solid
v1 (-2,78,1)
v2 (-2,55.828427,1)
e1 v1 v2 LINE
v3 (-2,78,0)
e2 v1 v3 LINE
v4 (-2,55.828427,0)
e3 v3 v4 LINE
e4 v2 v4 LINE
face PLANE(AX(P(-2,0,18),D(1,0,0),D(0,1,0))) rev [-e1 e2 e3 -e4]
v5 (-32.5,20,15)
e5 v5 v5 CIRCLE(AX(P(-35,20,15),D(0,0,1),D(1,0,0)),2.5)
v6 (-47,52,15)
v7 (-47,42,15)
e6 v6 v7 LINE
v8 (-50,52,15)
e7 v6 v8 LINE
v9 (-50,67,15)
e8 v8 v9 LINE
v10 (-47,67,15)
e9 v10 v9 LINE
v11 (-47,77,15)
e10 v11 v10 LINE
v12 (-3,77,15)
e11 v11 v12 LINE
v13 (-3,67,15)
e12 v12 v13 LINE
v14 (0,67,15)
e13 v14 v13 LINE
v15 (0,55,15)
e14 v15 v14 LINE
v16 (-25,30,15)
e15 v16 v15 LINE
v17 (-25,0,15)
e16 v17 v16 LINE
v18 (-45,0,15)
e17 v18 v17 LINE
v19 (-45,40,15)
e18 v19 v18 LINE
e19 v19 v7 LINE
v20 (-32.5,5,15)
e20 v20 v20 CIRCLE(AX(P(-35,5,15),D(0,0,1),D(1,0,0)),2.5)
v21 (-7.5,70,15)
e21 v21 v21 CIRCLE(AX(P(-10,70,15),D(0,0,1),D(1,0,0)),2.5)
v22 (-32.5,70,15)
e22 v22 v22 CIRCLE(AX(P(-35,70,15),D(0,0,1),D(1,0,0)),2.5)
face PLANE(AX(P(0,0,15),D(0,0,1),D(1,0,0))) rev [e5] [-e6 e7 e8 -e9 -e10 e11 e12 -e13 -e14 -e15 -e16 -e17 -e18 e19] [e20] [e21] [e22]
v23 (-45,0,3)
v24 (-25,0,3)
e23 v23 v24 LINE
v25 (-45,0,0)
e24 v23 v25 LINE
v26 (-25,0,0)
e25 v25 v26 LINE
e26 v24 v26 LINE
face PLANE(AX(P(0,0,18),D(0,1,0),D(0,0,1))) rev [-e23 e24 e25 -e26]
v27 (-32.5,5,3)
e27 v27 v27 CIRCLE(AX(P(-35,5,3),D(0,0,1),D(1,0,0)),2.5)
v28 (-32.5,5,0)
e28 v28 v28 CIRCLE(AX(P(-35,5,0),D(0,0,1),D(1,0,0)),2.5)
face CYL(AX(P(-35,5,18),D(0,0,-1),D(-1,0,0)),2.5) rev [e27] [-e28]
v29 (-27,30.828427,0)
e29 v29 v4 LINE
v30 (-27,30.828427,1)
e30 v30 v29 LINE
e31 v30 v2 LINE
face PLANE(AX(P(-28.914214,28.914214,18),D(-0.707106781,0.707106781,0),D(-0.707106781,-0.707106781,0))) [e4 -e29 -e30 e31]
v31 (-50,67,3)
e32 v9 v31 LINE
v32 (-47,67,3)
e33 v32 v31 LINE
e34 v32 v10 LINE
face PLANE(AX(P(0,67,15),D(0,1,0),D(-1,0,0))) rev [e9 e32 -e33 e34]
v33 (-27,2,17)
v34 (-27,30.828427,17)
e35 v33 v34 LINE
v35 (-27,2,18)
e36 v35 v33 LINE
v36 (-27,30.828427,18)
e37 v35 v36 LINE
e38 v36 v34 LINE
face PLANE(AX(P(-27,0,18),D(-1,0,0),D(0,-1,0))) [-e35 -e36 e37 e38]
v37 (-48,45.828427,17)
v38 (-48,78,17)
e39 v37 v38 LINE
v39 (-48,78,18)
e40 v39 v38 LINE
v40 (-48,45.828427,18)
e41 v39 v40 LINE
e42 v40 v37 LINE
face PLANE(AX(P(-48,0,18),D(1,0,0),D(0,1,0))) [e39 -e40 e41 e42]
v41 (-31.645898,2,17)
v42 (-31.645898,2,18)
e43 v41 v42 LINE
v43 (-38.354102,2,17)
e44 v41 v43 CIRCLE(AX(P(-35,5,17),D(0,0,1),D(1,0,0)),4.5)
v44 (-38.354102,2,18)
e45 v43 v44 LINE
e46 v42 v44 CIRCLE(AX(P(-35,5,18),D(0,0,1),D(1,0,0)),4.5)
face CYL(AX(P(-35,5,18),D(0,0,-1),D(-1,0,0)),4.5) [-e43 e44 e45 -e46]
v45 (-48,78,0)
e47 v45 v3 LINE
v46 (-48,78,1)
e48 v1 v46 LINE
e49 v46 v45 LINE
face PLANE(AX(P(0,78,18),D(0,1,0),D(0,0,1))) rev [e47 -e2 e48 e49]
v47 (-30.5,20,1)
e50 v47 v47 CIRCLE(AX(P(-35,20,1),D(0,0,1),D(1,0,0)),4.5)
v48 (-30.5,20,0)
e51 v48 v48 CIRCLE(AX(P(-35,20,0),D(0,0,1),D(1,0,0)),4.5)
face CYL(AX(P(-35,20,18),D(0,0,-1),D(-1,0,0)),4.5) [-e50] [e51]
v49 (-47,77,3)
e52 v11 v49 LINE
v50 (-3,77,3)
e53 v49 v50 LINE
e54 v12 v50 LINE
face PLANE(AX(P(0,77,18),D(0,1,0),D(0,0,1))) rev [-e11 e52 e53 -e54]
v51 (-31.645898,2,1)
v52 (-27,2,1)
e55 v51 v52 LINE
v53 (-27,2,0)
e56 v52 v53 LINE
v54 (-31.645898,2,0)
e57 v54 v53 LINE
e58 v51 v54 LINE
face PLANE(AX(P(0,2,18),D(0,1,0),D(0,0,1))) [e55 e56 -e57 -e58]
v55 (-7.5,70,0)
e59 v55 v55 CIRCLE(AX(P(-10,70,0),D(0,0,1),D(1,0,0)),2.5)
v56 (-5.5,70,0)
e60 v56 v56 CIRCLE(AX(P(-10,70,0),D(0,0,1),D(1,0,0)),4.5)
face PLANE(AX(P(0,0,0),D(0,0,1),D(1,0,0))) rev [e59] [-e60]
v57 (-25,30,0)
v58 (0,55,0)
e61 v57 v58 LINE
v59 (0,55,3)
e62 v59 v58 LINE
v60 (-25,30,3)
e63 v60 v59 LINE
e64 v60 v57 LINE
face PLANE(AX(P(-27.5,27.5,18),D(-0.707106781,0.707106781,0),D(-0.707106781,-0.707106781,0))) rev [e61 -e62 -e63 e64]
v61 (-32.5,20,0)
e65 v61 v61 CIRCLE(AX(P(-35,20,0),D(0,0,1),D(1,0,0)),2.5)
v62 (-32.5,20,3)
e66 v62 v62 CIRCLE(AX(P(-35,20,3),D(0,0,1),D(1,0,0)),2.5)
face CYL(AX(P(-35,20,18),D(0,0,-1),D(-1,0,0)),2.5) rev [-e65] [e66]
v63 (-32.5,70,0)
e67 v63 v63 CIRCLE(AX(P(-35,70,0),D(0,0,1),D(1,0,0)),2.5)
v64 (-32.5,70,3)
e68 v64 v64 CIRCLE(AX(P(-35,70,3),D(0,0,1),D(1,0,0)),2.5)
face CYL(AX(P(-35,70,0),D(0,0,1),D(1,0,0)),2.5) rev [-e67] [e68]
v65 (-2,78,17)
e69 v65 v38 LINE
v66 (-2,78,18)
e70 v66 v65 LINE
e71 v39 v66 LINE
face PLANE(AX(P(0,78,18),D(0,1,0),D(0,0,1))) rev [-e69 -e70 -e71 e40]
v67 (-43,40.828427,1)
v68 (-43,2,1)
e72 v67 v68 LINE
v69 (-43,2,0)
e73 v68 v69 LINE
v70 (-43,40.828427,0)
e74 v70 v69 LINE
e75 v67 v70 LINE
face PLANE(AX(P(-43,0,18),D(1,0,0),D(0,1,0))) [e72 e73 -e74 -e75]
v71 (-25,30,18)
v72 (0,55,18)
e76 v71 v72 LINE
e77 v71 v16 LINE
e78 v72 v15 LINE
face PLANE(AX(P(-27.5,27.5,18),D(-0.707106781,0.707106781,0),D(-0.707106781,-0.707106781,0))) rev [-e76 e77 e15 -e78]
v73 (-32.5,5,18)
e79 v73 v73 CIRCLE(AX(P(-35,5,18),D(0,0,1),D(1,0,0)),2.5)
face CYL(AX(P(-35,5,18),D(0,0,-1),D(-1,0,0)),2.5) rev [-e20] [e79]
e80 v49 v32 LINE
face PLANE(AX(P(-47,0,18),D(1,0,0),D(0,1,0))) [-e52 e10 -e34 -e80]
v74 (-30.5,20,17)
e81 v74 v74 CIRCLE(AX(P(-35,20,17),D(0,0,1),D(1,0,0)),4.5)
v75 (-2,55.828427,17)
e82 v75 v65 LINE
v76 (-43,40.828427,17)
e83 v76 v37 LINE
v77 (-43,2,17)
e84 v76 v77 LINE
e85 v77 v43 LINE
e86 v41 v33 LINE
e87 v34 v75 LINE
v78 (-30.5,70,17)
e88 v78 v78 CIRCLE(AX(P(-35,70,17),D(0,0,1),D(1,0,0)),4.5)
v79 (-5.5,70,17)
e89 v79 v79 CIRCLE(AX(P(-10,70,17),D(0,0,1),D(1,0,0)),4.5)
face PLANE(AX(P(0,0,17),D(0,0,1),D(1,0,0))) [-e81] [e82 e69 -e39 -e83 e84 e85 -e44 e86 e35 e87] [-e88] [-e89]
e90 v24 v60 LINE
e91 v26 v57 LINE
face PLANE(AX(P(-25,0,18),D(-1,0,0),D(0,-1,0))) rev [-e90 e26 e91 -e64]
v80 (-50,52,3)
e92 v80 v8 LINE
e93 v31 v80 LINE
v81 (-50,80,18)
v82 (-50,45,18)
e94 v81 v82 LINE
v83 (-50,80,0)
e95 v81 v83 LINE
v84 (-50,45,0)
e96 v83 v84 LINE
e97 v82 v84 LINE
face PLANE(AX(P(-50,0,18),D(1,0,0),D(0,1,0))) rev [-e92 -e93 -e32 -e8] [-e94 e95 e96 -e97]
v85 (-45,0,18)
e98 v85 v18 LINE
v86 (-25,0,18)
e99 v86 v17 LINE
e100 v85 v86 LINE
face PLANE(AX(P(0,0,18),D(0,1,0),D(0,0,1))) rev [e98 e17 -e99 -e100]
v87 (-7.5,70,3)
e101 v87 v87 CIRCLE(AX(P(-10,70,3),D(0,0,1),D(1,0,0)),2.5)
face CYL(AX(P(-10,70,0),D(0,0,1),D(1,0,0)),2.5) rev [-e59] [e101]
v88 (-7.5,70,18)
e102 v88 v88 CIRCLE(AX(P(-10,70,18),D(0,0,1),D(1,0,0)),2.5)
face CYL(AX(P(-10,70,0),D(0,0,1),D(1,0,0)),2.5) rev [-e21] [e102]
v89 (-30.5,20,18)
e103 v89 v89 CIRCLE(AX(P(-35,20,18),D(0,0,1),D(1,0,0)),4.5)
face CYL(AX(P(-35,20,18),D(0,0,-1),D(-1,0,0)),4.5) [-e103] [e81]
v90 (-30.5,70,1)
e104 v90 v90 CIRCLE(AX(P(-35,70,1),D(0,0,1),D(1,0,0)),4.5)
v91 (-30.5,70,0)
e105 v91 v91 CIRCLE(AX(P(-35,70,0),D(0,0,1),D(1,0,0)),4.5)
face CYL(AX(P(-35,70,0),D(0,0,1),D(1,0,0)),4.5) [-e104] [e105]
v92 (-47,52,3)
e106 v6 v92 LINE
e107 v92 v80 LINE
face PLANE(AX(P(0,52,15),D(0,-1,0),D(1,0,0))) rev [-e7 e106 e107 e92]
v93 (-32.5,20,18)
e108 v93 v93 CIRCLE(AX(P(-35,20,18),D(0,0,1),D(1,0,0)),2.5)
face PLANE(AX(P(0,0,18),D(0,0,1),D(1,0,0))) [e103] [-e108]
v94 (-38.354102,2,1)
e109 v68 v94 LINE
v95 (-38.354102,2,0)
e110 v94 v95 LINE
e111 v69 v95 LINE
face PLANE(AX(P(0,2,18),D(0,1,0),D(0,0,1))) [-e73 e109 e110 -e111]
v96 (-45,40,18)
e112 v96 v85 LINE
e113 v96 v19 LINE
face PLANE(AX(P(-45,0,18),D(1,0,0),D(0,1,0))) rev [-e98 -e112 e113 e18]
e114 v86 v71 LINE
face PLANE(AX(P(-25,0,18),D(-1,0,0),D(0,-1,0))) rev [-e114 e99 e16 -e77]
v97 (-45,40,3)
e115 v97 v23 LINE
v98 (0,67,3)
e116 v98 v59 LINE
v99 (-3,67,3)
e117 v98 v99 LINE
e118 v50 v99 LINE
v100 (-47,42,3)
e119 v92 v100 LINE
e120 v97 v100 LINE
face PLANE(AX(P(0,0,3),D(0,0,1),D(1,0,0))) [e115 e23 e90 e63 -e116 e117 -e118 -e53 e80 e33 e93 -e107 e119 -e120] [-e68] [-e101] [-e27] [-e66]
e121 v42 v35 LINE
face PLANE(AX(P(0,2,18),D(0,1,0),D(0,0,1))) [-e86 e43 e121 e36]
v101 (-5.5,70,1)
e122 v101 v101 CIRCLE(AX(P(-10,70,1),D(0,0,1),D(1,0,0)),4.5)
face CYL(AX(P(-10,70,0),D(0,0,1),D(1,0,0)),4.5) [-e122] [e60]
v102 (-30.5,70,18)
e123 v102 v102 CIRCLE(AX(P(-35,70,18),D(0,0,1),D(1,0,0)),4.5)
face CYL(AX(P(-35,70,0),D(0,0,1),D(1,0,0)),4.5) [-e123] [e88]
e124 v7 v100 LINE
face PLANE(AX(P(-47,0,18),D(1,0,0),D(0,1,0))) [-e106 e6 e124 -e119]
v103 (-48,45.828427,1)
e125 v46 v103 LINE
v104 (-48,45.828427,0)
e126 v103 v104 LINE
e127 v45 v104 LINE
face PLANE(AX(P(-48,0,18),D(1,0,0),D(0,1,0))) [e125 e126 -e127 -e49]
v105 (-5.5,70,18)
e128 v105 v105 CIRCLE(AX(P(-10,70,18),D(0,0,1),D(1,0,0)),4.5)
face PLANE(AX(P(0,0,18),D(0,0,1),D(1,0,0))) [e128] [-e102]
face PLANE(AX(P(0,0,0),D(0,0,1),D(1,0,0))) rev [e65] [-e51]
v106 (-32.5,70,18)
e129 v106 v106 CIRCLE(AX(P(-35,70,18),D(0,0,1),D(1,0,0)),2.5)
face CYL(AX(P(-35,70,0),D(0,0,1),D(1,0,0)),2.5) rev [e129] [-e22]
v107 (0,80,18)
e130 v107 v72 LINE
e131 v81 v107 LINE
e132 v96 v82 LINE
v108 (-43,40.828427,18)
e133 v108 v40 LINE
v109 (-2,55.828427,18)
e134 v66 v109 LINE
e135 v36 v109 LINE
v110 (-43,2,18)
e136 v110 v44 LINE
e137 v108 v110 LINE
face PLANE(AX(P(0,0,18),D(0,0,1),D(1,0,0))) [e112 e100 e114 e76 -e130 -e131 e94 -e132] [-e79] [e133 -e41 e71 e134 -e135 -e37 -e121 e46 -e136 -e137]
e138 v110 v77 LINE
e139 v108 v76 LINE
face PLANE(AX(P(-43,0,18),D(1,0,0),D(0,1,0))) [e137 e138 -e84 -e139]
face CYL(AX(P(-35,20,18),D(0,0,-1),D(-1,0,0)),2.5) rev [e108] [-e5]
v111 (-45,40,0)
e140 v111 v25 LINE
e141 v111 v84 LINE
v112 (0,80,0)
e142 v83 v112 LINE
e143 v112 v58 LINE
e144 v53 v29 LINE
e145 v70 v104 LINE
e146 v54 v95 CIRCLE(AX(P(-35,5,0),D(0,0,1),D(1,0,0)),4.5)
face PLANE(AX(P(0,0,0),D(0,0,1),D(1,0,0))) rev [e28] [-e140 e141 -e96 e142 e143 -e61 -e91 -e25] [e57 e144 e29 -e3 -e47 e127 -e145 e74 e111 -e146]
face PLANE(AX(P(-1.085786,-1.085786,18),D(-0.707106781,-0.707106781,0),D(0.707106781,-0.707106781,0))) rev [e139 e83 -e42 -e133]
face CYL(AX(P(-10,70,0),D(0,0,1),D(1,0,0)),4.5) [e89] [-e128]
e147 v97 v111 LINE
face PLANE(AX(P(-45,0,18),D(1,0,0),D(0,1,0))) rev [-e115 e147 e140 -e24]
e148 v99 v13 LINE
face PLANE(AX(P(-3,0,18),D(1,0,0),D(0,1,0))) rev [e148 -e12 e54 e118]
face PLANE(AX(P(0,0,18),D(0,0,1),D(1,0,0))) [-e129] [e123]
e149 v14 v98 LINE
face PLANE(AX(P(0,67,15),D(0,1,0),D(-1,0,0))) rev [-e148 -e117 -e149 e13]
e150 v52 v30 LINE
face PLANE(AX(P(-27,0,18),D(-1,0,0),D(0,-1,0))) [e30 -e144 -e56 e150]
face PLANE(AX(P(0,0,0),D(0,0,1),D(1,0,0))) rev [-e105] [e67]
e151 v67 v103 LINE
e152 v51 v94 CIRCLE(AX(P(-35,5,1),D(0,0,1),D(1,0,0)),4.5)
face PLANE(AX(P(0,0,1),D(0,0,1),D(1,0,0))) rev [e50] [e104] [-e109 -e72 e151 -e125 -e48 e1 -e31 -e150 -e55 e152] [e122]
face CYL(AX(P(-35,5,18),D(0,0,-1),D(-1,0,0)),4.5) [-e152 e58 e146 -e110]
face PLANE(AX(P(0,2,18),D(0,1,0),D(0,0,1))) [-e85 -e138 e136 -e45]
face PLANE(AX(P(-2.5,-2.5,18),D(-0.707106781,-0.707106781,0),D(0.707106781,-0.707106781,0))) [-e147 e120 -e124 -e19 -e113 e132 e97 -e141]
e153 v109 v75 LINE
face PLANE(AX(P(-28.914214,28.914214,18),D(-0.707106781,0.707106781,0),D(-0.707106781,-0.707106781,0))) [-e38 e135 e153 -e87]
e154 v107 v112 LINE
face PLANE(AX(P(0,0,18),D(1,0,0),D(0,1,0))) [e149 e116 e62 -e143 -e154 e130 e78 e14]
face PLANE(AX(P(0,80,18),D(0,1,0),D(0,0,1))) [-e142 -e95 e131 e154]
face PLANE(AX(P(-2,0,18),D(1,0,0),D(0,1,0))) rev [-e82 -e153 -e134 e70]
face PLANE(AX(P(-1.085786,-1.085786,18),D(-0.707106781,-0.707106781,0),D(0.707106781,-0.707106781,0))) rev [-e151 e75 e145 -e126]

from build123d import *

# Parameters (mm, degrees)
ESQUISSE1_R                  = 2.5
BOSS_EXTRU_1_DEPTH           = 18
COQUE2_T                     = -3
ENL_V_MAT_EXTRU_1_DEPTH      = 94.536089292
ENL_V_MAT_EXTRU_1_DEPTH_BACK = 94.536089292
ESQUISSE2_W                  = 12
ESQUISSE2_H                  = 15
ESQUISSE3_R                  = 2.5
ENL_V_MAT_EXTRU_3_DEPTH      = 97.041657628
SHELL2_OUTLINE_R             = 4.5
SHELL2_DEPTH                 = 1
SHELL2_START                 = 17
SHELL2_2_OUTLINE_R           = 4.5
SHELL2_2_DEPTH               = 1


# Read off the part's stored shape, not the designer's step: Shell2
with BuildPart() as part:
    # Esquisse1 → Boss.-Extru.1 (new body)
    with BuildSketch(Plane.XY):
        Polygon((-50, 45), (-45, 40), (-45, 0), (-25, 0), (-25, 30), (0, 55), (0, 80), (-50, 80), align=None)
        with Locations((-35, 5)):
            Circle(ESQUISSE1_R, mode=Mode.SUBTRACT)
        with Locations((-35, 20)):
            Circle(ESQUISSE1_R, mode=Mode.SUBTRACT)
    extrude(amount=BOSS_EXTRU_1_DEPTH)

    # Coque2
    coque2_openings = [part.faces().sort_by_distance(p)[0] for p in [
        (-35, 0, 9),
        (-45, 20, 9),
        (-47.5, 42.5, 9),
        (-12.5, 42.5, 9),
        (-25, 15, 9),
        (-37.5, 5, 9),
        (-37.5, 20, 9),
    ]]
    offset(amount=COQUE2_T, openings=coque2_openings, kind=Kind.INTERSECTION)

    # Esquisse2 → Enlèv. mat.-Extru.1 (cut, two sides: drawn at the far end of the back side and taken through both)
    with BuildSketch(Plane.ZY.offset(45).offset(-ENL_V_MAT_EXTRU_1_DEPTH_BACK)):
        with Locations((9, 59.5)):
            Rectangle(ESQUISSE2_W, ESQUISSE2_H)
    extrude(amount=ENL_V_MAT_EXTRU_1_DEPTH + ENL_V_MAT_EXTRU_1_DEPTH_BACK, mode=Mode.SUBTRACT)

    # Esquisse3 → Enlèv. mat.-Extru.3 (cut, through all)
    with BuildSketch(Plane.XY.offset(18)):
        with Locations((-35, 70)):
            Circle(ESQUISSE3_R)
        with Locations((-10, 70)):
            Circle(ESQUISSE3_R)
    extrude(amount=-ENL_V_MAT_EXTRU_3_DEPTH, mode=Mode.SUBTRACT)

    # Shell2 outline → Shell2 (cut)
    with BuildSketch(Plane.XY):
        with BuildLine():
            Line((-43, 2), (-38.354101966, 2))
            ThreePointArc((-38.354101966, 2), (-35, 9.5), (-31.645898034, 2))
            Line((-31.645898034, 2), (-27, 2))
            Line((-27, 2), (-27, 30.828427125))
            Line((-27, 30.828427125), (-2, 55.828427125))
            Line((-2, 55.828427125), (-2, 78))
            Line((-2, 78), (-48, 78))
            Line((-48, 78), (-48, 45.828427125))
            Line((-48, 45.828427125), (-43, 40.828427125))
            Line((-43, 40.828427125), (-43, 2))
        make_face()
        with Locations((-35, 20)):
            Circle(SHELL2_OUTLINE_R, mode=Mode.SUBTRACT)
        with Locations((-35, 70)):
            Circle(SHELL2_OUTLINE_R, mode=Mode.SUBTRACT)
        with Locations((-10, 70)):
            Circle(SHELL2_OUTLINE_R, mode=Mode.SUBTRACT)
    extrude(amount=SHELL2_DEPTH, mode=Mode.SUBTRACT)

    # Shell2 2 outline → Shell2 2 (cut)
    with BuildSketch(Plane.XY.offset(SHELL2_START)):
        with BuildLine():
            Line((-43, 2), (-38.354101966, 2))
            ThreePointArc((-38.354101966, 2), (-35, 9.5), (-31.645898034, 2))
            Line((-31.645898034, 2), (-27, 2))
            Line((-27, 2), (-27, 30.828427125))
            Line((-27, 30.828427125), (-2, 55.828427125))
            Line((-2, 55.828427125), (-2, 78))
            Line((-2, 78), (-48, 78))
            Line((-48, 78), (-48, 45.828427125))
            Line((-48, 45.828427125), (-43, 40.828427125))
            Line((-43, 40.828427125), (-43, 2))
        make_face()
        with Locations((-35, 20)):
            Circle(SHELL2_2_OUTLINE_R, mode=Mode.SUBTRACT)
        with Locations((-35, 70)):
            Circle(SHELL2_2_OUTLINE_R, mode=Mode.SUBTRACT)
        with Locations((-10, 70)):
            Circle(SHELL2_2_OUTLINE_R, mode=Mode.SUBTRACT)
    extrude(amount=SHELL2_2_DEPTH, mode=Mode.SUBTRACT)


solid = part.part
